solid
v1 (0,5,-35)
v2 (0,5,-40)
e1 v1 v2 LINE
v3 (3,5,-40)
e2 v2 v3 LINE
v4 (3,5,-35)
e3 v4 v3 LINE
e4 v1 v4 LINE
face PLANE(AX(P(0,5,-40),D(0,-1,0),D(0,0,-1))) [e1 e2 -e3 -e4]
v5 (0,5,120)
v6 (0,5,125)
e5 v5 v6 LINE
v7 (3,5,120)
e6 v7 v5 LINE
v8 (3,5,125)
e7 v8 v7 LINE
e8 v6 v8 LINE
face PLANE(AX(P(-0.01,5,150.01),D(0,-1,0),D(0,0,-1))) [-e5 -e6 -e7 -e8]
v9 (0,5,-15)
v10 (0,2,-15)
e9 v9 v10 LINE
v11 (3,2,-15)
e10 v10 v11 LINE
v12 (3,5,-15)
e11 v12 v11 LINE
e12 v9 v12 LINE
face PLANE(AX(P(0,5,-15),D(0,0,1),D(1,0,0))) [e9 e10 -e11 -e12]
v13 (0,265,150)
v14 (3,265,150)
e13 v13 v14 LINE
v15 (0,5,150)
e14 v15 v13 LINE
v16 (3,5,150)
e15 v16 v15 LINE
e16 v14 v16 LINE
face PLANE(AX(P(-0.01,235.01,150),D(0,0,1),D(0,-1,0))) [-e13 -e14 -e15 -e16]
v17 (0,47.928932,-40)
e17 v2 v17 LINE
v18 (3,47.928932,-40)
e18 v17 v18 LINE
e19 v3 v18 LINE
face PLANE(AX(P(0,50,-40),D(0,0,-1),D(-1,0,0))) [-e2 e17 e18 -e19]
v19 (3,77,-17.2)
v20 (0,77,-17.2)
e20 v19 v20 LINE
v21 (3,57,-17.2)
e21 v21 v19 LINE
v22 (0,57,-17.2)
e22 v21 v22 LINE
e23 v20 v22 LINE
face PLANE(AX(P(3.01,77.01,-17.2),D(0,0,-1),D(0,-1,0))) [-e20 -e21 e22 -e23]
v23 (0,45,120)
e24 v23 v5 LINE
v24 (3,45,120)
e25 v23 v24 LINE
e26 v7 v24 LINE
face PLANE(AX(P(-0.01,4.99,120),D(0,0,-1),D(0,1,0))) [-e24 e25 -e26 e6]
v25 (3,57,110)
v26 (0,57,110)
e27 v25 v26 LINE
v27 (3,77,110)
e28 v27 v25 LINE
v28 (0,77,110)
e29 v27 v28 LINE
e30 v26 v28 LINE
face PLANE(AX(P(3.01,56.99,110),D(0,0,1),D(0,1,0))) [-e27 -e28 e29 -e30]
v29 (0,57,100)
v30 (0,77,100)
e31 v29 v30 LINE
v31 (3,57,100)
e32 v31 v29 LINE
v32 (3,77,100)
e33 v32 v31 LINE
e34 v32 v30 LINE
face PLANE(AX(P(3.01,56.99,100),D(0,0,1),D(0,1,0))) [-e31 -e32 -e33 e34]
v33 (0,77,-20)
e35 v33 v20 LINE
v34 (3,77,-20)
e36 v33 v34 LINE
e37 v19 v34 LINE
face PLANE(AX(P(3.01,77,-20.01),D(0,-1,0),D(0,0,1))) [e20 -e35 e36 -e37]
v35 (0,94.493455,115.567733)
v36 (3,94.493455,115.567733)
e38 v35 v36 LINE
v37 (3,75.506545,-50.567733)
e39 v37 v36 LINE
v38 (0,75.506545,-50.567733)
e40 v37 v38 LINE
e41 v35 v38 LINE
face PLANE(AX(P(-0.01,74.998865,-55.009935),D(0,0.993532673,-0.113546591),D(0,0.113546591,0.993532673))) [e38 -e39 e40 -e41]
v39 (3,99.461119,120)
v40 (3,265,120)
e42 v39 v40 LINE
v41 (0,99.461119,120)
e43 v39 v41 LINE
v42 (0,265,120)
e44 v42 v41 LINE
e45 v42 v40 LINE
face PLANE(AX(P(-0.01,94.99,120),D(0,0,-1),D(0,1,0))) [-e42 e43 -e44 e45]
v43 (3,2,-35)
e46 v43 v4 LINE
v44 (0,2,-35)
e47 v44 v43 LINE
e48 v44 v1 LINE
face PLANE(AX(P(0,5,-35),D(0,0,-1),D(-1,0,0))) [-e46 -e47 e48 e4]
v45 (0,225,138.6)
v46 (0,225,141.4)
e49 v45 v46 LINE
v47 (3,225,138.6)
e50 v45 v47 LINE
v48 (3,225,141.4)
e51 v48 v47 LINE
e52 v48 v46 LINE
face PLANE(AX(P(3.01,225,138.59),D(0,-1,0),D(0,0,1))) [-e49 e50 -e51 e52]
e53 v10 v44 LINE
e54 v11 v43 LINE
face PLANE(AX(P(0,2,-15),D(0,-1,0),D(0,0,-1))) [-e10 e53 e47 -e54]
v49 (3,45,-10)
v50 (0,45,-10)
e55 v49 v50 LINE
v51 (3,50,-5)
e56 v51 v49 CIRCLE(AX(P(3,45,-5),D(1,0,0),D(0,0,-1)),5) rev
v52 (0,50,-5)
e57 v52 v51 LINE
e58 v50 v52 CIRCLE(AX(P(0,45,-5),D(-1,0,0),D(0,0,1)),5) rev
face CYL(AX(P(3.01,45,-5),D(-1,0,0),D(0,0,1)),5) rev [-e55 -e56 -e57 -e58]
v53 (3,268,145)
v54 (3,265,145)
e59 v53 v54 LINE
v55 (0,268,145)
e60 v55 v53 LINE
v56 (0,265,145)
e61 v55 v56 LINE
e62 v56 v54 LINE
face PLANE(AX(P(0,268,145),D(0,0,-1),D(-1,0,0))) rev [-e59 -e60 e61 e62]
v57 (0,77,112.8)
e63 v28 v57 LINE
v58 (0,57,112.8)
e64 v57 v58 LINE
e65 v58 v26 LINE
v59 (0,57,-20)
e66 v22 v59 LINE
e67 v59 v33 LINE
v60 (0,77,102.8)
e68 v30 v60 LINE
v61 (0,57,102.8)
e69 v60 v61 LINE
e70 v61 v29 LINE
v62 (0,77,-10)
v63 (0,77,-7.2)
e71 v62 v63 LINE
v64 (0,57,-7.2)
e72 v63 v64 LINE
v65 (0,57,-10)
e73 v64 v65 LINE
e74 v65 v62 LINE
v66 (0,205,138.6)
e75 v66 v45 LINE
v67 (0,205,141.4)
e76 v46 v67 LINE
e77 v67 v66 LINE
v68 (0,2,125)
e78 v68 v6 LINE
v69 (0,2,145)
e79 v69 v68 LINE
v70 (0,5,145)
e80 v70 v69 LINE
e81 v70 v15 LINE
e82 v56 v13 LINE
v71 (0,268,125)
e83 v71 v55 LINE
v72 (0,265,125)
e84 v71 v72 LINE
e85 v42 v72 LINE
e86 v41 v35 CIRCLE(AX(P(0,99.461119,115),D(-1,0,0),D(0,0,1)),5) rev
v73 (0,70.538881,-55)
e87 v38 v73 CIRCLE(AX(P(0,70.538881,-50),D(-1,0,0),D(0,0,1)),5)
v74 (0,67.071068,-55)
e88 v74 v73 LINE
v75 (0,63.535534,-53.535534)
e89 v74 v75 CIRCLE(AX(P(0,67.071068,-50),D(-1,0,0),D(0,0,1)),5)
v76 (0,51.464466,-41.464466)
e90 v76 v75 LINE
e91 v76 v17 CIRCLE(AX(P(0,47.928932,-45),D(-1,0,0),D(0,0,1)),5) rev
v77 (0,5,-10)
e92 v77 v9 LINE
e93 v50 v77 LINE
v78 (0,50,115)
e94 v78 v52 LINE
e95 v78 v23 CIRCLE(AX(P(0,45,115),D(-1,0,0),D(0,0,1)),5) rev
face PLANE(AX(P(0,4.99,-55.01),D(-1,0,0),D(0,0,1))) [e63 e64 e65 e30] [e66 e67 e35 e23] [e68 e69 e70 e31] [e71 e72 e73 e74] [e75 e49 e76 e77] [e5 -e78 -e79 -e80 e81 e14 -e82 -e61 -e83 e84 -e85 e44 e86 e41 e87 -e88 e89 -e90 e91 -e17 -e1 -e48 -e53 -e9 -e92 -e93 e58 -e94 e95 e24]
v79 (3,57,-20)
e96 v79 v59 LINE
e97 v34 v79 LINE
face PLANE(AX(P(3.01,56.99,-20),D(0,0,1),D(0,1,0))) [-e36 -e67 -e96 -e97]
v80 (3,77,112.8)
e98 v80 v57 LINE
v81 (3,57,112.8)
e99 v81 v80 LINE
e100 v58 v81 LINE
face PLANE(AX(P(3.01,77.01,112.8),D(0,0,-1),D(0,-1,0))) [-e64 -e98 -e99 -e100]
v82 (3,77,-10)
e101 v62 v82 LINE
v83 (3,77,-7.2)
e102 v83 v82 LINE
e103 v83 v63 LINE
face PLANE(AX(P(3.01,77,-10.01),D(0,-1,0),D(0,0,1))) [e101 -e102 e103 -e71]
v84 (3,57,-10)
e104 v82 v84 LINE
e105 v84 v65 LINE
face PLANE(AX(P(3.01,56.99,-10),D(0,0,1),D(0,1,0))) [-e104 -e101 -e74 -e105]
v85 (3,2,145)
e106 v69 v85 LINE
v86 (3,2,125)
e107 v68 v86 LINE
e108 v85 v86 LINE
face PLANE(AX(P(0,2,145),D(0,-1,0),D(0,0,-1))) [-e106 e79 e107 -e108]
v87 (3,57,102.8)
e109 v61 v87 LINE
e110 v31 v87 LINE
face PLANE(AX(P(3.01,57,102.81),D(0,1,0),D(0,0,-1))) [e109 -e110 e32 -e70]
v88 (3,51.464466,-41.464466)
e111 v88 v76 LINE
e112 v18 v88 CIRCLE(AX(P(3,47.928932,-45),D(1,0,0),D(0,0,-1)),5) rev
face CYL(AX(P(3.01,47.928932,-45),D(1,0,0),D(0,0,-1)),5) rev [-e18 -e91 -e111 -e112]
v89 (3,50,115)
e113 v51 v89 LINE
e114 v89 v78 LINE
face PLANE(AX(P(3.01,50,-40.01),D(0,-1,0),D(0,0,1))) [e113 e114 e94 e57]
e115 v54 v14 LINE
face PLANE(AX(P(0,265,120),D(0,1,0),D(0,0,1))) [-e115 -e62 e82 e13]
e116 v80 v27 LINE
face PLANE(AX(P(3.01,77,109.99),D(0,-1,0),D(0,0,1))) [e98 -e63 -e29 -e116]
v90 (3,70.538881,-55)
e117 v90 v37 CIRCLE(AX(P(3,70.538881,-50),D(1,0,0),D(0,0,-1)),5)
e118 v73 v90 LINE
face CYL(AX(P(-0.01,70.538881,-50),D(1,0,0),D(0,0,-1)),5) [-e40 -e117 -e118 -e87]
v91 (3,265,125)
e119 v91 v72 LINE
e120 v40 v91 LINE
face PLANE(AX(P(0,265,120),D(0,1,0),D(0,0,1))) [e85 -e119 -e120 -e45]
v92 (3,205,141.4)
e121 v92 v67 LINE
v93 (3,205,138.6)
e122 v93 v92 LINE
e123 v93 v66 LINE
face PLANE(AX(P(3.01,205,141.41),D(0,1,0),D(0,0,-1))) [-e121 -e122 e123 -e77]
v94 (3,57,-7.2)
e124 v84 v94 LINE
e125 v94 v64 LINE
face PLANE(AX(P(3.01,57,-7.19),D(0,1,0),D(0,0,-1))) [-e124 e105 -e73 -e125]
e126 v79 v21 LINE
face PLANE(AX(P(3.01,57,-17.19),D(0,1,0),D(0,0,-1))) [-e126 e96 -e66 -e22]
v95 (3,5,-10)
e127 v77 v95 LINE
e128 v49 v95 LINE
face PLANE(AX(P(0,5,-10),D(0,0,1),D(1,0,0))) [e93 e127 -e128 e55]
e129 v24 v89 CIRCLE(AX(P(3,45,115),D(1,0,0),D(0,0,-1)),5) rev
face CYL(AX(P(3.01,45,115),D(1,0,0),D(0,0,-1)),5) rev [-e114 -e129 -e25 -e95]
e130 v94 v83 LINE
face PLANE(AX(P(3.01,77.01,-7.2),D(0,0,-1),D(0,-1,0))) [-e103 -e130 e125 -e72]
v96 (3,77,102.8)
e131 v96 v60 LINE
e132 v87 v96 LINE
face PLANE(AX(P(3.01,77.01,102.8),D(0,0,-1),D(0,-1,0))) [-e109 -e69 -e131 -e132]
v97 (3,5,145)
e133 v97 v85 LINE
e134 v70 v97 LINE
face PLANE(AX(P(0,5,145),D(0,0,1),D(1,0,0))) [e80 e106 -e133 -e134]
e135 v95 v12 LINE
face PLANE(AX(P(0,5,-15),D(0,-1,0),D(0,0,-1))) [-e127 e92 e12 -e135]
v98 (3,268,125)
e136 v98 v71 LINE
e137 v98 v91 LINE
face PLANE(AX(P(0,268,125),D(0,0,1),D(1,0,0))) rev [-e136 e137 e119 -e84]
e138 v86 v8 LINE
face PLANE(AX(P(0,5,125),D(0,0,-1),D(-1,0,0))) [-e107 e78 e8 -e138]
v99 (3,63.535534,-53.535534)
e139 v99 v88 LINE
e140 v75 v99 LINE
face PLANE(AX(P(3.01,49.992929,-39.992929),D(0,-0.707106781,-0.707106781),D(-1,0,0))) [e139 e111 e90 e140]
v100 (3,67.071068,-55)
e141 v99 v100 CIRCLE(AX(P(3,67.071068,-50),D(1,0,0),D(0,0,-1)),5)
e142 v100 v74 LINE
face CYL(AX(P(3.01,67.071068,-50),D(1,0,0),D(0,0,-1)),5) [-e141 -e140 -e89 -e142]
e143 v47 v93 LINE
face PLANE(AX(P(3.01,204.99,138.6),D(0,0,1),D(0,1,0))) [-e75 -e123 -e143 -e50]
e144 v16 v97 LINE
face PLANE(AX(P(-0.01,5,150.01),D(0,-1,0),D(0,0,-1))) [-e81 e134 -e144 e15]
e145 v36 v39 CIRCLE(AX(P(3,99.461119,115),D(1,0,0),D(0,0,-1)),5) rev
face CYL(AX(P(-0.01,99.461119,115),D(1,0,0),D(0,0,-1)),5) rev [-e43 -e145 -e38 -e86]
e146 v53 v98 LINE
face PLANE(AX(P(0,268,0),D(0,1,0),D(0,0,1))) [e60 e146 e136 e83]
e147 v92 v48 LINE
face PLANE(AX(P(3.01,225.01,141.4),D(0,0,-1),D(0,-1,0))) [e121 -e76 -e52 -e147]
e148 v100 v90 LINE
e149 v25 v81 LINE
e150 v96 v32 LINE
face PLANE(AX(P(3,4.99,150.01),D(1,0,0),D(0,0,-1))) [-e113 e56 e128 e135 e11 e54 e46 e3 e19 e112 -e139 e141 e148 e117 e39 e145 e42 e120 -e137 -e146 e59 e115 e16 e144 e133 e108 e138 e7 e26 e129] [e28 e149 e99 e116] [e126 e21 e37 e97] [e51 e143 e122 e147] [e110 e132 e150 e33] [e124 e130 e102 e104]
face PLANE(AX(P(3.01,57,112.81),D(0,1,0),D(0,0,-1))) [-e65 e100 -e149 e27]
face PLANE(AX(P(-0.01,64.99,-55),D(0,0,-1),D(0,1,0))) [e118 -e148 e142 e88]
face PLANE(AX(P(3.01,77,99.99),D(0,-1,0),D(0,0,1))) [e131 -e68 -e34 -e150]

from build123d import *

# Parameters (mm, degrees)
BOSS_EXTRUDE1_START     = -3
BOSS_EXTRUDE1_OUTLINE_W = 2.8
BOSS_EXTRUDE1_OUTLINE_H = 20
BOSS_EXTRUDE1_DEPTH     = 3
SKETCH2_W               = 3
SKETCH2_H               = 20
BOSS_EXTRUDE2_DEPTH     = 3
SKETCH3_W               = 20
SKETCH3_H               = 3
BOSS_EXTRUDE3_DEPTH     = 3
FILLET1_R               = 5
FILLET2_R               = 5


with BuildPart() as part:
    # Boss-Extrude1: read off the stored shape, not the designer's step
    # Boss-Extrude1 outline → Boss-Extrude1 (new body)
    with BuildSketch(Plane(origin=(3, 0, 0), x_dir=(0, 0, -1), z_dir=(1, 0, 0)).offset(BOSS_EXTRUDE1_START)):
        Polygon((55, 65), (55, 75), (-120, 95), (-120, 265), (-150, 265), (-150, 5), (-120, 5), (-120, 50), (40, 50), align=None)
        with Locations((-111.4, 67)):
            Rectangle(BOSS_EXTRUDE1_OUTLINE_W, BOSS_EXTRUDE1_OUTLINE_H, mode=Mode.SUBTRACT)
        with Locations((-101.4, 67)):
            Rectangle(BOSS_EXTRUDE1_OUTLINE_W, BOSS_EXTRUDE1_OUTLINE_H, mode=Mode.SUBTRACT)
        with Locations((8.6, 67)):
            Rectangle(BOSS_EXTRUDE1_OUTLINE_W, BOSS_EXTRUDE1_OUTLINE_H, mode=Mode.SUBTRACT)
        with Locations((18.6, 67)):
            Rectangle(BOSS_EXTRUDE1_OUTLINE_W, BOSS_EXTRUDE1_OUTLINE_H, mode=Mode.SUBTRACT)
        with Locations((-140, 215)):
            Rectangle(BOSS_EXTRUDE1_OUTLINE_W, BOSS_EXTRUDE1_OUTLINE_H, mode=Mode.SUBTRACT)
    extrude(amount=BOSS_EXTRUDE1_DEPTH)

    # Sketch2 → Boss-Extrude2 (add)
    with BuildSketch(Plane(origin=(0, 265, 0), x_dir=(1, 0, 0), z_dir=(0, 1, 0))):
        with Locations((1.5, -135)):
            Rectangle(SKETCH2_W, SKETCH2_H)
    extrude(amount=BOSS_EXTRUDE2_DEPTH)

    # Sketch3 → Boss-Extrude3 (add)
    with BuildSketch(Plane(origin=(3, 0, 0), x_dir=(0, 0, -1), z_dir=(1, 0, 0))):
        with Locations((-135, 3.5)):
            Rectangle(SKETCH3_W, SKETCH3_H)
        Polygon((40, 50), (40, 5), (35, 5), (35, 2), (15, 2), (15, 5), (10, 5), (10, 50), align=None)
    extrude(amount=-BOSS_EXTRUDE3_DEPTH)

    # Fillet1
    fillet1_edges = [part.edges().sort_by_distance(p)[0] for p in [
        (1.5, 65, -55),
        (1.5, 50, -10),
        (1.5, 75, -55),
        (1.5, 50, -40),
        (1.5, 50, 120),
    ]]
    fillet(fillet1_edges, radius=FILLET1_R)

    # Fillet2
    fillet2_edges = [part.edges().sort_by_distance(p)[0] for p in [
        (1.5, 95, 120),
    ]]
    fillet(fillet2_edges, radius=FILLET2_R)


solid = part.part
